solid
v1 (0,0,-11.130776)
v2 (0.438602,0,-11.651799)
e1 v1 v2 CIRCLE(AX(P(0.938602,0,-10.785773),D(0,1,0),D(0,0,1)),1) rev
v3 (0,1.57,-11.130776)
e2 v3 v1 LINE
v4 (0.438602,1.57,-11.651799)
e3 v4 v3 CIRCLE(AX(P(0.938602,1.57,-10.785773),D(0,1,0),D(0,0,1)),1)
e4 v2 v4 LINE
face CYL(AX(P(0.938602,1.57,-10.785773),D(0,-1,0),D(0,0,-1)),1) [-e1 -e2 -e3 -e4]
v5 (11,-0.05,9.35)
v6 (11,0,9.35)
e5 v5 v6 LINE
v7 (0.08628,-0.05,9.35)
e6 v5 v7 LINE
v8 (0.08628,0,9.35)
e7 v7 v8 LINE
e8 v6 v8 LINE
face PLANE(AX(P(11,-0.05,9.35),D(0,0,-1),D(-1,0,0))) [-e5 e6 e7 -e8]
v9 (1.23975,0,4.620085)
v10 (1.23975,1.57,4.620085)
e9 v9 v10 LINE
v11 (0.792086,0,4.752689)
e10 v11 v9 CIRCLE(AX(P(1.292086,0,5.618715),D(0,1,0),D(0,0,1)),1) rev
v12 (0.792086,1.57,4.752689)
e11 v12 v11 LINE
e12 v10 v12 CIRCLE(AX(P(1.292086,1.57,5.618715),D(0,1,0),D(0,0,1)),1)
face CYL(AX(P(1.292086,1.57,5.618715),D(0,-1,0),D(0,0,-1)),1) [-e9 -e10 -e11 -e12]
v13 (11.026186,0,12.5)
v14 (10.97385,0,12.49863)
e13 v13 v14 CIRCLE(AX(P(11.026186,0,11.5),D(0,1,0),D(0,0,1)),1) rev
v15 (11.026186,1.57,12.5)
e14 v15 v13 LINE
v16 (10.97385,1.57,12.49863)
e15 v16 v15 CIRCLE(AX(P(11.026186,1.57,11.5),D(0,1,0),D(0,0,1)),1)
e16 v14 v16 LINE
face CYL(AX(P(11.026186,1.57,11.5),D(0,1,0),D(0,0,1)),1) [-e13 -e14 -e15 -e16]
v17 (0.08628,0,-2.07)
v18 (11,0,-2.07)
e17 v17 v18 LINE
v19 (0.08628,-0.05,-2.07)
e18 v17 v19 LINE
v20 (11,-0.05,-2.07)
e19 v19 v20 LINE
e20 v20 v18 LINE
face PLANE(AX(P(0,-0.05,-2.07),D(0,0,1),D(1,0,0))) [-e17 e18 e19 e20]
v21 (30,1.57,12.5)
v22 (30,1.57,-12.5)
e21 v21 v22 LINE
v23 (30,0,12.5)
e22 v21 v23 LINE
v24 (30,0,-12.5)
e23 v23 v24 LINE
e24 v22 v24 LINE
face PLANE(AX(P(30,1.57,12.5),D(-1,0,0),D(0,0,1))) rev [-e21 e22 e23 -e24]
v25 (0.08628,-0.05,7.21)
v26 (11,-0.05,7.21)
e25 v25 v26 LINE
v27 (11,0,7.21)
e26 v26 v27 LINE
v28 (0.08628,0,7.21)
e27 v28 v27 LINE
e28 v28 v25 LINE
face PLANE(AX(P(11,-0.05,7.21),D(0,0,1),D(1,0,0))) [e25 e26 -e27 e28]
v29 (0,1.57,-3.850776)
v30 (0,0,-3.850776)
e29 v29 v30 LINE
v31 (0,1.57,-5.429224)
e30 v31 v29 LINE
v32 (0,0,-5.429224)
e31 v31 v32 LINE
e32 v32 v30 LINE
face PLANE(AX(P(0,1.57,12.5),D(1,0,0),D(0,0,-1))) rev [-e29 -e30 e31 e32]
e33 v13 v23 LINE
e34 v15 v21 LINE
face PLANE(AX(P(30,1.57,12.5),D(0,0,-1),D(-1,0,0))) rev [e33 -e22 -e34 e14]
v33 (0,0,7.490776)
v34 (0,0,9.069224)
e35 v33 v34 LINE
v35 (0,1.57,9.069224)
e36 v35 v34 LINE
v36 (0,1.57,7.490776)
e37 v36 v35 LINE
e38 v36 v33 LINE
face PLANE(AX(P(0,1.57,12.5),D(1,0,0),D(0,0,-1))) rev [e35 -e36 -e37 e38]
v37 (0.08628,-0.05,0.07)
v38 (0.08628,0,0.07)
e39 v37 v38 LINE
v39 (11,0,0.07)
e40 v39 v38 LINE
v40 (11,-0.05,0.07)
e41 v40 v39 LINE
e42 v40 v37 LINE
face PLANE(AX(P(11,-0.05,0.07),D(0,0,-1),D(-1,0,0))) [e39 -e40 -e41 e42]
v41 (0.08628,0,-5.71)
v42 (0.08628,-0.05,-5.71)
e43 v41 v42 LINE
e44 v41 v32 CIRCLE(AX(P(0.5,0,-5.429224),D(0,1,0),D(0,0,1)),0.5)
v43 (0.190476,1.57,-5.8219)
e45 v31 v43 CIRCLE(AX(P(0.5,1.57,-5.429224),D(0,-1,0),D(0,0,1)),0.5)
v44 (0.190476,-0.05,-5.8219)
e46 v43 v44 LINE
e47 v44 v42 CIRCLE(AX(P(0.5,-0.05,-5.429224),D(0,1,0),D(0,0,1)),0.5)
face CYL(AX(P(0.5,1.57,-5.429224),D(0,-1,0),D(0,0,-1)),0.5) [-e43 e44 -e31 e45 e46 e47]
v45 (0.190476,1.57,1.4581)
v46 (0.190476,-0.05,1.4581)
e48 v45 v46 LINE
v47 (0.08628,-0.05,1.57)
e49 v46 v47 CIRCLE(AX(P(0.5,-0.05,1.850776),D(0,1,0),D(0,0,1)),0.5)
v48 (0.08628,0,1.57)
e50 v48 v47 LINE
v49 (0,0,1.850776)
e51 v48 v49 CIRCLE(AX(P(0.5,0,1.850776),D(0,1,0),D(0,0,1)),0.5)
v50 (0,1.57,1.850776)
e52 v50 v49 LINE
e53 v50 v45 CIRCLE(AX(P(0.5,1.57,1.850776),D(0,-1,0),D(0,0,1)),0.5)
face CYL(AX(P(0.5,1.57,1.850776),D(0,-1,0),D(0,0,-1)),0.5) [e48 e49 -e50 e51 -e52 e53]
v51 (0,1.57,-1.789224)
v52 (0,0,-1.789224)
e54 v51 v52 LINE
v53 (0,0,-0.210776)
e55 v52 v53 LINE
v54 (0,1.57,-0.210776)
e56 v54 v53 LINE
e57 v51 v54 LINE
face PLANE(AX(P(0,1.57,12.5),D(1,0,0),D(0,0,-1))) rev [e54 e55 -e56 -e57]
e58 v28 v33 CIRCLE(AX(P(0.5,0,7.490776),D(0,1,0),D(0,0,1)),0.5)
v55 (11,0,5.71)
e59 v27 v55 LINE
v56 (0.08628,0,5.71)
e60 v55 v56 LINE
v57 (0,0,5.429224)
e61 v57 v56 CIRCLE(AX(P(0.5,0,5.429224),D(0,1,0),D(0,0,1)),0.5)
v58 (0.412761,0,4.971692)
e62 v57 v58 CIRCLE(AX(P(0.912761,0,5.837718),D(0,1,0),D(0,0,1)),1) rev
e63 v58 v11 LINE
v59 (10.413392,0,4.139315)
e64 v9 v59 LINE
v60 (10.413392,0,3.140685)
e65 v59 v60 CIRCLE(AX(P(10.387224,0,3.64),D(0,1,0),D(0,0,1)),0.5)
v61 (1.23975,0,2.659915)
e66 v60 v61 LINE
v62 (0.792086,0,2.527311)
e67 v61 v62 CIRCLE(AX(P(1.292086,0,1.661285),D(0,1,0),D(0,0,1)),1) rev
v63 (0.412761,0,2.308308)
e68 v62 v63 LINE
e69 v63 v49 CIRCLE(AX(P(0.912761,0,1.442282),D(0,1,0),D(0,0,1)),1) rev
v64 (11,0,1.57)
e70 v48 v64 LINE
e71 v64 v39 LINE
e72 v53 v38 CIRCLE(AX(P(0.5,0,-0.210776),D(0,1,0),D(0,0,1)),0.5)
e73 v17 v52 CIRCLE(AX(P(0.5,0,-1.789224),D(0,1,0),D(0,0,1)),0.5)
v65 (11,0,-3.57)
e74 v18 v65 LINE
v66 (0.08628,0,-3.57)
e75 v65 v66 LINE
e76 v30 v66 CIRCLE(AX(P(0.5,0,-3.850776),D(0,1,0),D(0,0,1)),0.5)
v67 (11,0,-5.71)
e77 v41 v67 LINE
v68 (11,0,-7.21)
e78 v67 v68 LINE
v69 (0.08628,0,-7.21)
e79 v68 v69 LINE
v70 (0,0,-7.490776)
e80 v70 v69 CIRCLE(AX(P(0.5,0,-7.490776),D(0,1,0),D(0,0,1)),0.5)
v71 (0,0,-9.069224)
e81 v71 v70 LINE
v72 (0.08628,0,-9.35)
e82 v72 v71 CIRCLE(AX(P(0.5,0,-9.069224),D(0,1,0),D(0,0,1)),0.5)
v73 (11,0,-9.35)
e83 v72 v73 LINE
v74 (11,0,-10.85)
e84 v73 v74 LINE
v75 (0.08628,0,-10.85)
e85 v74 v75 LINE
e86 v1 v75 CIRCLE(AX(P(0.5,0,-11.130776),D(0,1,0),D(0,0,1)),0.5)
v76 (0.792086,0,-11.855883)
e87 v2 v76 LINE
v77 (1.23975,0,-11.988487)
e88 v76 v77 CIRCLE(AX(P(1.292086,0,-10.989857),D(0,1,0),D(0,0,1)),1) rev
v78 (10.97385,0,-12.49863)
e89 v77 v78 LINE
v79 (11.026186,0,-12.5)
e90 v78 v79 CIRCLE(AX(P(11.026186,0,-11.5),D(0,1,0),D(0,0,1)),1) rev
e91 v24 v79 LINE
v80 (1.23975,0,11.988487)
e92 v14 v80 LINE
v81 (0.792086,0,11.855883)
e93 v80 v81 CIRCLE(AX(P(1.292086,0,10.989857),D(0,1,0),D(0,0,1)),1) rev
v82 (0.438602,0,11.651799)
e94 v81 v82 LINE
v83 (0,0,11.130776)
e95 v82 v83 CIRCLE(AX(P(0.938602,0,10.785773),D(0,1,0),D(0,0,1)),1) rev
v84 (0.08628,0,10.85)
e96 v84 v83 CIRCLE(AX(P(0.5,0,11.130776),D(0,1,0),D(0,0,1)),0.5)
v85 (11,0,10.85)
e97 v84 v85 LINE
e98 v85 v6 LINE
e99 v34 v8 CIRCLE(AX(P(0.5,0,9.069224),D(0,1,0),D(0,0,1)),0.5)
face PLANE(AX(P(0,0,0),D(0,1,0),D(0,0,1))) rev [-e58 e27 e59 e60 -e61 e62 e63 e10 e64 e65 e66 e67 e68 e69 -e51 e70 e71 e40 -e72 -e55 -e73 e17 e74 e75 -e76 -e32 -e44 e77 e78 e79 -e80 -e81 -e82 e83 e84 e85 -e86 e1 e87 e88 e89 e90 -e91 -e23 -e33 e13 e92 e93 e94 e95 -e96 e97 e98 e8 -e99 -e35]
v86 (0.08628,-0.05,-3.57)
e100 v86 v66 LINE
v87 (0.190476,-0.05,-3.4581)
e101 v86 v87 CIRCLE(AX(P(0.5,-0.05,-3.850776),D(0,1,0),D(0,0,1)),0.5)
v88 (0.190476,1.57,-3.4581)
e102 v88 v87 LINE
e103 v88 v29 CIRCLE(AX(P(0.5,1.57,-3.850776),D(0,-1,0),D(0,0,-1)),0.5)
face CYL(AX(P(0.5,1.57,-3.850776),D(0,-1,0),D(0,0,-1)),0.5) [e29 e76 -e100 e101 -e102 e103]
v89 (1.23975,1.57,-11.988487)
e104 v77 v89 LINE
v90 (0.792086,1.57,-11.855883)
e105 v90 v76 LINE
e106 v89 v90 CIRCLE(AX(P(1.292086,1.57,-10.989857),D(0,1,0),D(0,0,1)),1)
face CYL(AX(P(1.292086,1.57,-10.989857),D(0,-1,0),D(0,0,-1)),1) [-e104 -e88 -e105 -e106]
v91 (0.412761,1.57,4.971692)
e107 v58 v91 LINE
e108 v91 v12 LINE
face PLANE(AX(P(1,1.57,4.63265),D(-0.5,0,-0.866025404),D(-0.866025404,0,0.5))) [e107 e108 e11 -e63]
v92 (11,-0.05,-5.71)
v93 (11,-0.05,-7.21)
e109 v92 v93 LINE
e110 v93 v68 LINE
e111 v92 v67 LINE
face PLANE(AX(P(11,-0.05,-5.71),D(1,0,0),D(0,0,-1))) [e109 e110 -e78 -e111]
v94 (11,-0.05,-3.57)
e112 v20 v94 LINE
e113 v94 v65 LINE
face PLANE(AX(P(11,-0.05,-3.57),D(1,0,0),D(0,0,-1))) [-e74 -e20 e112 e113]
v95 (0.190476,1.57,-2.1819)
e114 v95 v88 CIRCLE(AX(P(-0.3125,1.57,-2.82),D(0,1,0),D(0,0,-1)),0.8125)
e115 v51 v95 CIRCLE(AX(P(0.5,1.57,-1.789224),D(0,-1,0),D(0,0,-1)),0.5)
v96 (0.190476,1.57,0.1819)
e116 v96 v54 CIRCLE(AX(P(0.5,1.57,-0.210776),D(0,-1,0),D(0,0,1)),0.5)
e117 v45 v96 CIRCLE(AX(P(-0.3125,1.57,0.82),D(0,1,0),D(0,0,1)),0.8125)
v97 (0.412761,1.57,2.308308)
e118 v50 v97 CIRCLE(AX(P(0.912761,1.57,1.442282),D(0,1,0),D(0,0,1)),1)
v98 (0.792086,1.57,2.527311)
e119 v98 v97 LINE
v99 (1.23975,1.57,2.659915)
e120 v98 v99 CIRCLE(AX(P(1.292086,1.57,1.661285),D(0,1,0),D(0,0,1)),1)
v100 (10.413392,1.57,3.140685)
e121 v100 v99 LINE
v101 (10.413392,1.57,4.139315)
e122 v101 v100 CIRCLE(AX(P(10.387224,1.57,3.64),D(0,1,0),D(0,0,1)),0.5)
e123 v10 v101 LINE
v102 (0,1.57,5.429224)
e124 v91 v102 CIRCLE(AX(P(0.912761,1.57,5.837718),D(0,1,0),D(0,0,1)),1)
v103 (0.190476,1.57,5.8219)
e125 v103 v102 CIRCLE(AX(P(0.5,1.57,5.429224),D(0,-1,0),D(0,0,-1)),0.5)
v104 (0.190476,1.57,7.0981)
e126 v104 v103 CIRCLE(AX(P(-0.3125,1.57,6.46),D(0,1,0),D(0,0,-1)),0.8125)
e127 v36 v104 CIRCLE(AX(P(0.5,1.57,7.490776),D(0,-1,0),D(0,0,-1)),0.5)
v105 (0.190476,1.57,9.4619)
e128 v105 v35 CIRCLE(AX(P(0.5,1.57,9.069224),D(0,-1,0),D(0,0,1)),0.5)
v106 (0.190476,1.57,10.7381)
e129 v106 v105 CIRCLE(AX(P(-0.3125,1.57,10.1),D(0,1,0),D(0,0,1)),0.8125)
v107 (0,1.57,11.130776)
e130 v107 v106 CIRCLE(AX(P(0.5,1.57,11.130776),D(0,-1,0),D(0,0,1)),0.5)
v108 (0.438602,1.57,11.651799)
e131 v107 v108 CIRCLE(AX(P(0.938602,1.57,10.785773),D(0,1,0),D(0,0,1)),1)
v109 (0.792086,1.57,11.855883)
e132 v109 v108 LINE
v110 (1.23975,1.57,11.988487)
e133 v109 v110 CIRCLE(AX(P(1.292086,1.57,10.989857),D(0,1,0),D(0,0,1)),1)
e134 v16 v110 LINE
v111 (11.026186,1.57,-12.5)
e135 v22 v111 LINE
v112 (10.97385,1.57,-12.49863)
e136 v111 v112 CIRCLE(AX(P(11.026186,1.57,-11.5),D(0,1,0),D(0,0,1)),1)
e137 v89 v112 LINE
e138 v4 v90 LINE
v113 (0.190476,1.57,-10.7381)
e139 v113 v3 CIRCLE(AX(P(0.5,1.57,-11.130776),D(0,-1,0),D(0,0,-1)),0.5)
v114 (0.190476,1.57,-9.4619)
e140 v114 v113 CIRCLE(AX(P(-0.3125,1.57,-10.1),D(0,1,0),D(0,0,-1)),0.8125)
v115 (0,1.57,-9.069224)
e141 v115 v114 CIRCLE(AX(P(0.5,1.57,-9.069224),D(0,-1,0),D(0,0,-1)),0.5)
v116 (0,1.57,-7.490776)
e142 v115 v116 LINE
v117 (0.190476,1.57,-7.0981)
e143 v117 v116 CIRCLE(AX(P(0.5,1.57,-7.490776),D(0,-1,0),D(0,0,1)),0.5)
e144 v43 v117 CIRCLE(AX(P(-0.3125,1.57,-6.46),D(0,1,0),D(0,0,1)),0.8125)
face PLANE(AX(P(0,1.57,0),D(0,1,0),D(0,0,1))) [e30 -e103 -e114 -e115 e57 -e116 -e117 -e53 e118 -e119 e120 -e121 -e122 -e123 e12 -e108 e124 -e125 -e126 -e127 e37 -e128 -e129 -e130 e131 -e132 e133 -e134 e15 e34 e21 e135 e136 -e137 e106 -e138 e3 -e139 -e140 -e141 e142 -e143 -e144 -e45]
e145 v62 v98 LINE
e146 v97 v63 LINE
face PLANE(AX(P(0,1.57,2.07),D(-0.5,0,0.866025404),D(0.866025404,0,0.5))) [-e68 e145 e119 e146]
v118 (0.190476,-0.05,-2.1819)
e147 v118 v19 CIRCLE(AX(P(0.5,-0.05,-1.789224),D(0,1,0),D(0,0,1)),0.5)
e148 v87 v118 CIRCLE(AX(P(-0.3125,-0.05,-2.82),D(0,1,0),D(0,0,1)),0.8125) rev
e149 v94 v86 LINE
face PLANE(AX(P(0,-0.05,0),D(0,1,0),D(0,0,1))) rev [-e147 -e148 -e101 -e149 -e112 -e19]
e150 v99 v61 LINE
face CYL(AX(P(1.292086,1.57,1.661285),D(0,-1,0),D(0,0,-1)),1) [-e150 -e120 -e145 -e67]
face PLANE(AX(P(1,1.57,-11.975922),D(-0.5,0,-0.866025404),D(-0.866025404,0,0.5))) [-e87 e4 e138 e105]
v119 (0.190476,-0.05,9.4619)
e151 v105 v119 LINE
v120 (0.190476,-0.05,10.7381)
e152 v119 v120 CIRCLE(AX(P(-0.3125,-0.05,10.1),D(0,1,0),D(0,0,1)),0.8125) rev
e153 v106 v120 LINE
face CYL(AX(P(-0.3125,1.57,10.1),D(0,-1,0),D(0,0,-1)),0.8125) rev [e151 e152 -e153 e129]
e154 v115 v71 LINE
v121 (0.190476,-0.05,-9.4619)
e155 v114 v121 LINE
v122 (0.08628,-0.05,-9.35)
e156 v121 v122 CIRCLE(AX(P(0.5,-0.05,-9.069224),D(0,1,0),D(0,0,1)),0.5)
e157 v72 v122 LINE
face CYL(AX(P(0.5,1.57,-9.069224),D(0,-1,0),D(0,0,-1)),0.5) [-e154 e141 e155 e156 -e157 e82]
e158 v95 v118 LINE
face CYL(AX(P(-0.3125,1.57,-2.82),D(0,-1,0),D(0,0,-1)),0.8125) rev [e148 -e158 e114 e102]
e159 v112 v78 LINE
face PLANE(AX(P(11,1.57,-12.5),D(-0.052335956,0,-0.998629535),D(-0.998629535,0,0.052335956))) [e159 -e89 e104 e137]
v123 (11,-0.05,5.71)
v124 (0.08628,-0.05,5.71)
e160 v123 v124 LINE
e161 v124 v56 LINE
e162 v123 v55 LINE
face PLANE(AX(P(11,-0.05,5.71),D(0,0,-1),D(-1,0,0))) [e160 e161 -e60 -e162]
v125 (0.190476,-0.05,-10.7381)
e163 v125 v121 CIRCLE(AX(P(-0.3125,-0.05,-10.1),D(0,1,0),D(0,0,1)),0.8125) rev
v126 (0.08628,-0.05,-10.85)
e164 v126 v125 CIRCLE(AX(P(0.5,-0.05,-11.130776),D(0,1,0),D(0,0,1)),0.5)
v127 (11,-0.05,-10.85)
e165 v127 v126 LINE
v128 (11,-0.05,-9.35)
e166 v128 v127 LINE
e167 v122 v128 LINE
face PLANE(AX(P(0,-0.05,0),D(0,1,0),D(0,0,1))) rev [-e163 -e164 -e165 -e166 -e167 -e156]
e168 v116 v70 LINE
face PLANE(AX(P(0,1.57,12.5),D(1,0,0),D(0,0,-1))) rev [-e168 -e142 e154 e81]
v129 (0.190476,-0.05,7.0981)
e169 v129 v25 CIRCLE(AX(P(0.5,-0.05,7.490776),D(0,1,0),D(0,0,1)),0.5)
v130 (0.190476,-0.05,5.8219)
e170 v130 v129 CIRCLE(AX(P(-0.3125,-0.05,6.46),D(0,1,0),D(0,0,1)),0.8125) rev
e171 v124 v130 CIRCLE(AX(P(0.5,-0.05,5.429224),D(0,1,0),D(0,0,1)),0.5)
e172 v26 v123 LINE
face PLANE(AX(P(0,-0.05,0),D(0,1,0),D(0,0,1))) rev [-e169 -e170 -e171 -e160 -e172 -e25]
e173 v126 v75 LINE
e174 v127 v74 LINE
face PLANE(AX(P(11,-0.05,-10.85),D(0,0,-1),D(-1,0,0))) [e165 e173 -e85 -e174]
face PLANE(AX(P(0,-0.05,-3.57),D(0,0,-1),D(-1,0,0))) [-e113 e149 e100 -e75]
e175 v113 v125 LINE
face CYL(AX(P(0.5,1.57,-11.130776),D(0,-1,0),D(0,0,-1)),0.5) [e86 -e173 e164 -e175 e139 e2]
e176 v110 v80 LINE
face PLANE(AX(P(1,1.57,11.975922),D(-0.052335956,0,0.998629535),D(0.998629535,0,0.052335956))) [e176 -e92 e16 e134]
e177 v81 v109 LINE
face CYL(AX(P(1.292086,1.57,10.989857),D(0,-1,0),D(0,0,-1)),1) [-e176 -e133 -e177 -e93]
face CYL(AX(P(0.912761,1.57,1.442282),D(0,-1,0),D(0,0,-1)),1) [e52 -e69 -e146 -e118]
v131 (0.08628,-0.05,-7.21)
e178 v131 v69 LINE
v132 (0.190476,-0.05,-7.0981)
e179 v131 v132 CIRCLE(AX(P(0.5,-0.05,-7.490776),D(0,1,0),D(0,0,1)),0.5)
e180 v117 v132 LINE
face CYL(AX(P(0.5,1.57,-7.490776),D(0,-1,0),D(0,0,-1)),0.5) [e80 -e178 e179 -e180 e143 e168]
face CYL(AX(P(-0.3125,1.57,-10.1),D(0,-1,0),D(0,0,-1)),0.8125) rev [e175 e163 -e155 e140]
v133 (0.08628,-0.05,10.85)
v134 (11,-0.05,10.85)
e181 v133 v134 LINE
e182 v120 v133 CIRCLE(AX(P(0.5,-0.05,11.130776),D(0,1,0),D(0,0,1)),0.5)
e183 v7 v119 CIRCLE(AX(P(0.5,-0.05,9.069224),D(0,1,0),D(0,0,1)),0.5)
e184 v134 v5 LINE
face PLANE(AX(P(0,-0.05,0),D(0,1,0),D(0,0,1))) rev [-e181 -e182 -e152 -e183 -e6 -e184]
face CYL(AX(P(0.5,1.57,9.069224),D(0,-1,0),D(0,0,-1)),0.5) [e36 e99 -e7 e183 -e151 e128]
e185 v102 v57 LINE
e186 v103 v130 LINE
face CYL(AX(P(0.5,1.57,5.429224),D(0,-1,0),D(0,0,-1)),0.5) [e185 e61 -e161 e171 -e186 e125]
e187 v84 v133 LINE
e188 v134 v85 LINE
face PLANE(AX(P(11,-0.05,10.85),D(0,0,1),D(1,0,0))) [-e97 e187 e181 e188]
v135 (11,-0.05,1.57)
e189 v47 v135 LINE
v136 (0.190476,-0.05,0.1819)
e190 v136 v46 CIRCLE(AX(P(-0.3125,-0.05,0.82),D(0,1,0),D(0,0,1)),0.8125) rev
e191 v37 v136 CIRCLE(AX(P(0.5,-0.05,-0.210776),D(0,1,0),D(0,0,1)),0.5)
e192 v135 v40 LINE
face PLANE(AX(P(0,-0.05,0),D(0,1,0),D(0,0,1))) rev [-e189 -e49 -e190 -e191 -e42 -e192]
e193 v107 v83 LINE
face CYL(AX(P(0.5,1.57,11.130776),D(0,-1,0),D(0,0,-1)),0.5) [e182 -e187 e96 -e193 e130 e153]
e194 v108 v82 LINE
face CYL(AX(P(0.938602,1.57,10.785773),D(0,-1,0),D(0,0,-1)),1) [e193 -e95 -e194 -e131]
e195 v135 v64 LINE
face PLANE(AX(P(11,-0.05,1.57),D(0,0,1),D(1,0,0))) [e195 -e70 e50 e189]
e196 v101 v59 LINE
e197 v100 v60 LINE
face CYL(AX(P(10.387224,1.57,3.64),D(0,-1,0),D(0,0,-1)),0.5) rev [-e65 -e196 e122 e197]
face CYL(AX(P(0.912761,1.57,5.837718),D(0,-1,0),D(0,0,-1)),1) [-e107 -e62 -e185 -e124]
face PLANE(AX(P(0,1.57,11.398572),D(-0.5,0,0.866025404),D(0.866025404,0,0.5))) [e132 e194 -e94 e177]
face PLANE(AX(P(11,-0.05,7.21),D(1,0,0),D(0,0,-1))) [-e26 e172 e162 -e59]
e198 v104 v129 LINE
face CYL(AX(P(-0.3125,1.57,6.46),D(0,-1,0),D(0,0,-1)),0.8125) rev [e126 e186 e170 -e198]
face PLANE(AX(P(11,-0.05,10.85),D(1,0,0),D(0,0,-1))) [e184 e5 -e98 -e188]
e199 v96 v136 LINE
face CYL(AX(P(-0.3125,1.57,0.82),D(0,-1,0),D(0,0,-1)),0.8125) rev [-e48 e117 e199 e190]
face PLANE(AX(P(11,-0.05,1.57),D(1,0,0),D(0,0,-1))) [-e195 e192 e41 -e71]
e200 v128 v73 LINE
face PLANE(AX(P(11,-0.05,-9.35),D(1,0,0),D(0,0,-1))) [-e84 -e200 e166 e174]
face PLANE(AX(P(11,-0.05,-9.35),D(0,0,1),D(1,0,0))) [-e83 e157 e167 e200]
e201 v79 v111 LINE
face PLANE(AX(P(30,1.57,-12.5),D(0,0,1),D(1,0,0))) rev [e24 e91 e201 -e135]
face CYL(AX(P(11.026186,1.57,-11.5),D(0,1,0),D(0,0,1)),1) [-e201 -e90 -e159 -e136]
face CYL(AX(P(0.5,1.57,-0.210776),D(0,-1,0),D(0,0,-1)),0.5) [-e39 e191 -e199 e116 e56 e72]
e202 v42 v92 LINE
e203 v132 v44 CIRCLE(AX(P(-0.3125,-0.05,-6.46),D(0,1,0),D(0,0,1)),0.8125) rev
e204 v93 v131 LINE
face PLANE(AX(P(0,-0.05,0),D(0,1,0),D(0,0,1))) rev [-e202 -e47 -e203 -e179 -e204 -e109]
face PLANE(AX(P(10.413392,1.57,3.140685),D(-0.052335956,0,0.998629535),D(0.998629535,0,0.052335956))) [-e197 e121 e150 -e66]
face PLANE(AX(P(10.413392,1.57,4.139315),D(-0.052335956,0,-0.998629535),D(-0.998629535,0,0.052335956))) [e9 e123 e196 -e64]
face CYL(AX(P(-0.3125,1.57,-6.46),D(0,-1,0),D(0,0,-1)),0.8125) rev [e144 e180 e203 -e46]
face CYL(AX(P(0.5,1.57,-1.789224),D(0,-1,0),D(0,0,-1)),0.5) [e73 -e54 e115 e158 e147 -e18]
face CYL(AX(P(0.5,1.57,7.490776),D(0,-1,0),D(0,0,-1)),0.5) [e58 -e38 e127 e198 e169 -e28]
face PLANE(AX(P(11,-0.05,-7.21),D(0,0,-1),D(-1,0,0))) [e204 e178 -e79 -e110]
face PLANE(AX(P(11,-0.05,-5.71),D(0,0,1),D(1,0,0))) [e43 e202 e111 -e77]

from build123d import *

# Parameters (mm, degrees)
SKETCH1_W               = 30
SKETCH1_H               = 25
BOSS_EXTRUDE1_DEPTH     = 1.57
CUT_EXTRUDE1_DEPTH      = 33.53789944
SKETCH2_W               = 11
SKETCH2_H               = 1.5
BOSS_EXTRUDE2_DEPTH     = 0.05
CUT_EXTRUDE2_DEPTH      = 33.53789944
CUT_EXTRUDE2_DEPTH_BACK = 33.53789944
FILLET1_R               = 1


with BuildPart() as part:
    # Sketch1 → Boss-Extrude1 (new body)
    with BuildSketch(Plane(origin=(0, 0, 0), x_dir=(1, 0, 0), z_dir=(0, 1, 0))):
        with Locations((15, 0)):
            Rectangle(SKETCH1_W, SKETCH1_H)
    extrude(amount=BOSS_EXTRUDE1_DEPTH)

    # Sketch3 → Cut-Extrude1 (cut, through all)
    with BuildSketch(Plane(origin=(0, 0, 0), x_dir=(1, 0, 0), z_dir=(0, 1, 0))):
        with BuildLine():
            Line((10.41339187, -4.139314767), (1, -4.632649731))
            Line((1, -4.632649731), (0, -5.21))
            Line((0, -5.21), (0, -2.07))
            Line((0, -2.07), (1, -2.647350269))
            Line((1, -2.647350269), (10.41339187, -3.140685233))
            ThreePointArc((10.41339187, -3.140685233), (10.887223892, -3.64), (10.41339187, -4.139314767))
        make_face()
        Polygon((11, 12.5), (1, 11.975922207), (0, 11.398571938), (0, 12.5), align=None)
        Polygon((11, -12.5), (0, -12.5), (0, -11.398571938), (1, -11.975922207), align=None)
    extrude(amount=CUT_EXTRUDE1_DEPTH, mode=Mode.SUBTRACT)

    # Sketch2 → Boss-Extrude2 (add)
    with BuildSketch(Plane(origin=(0, 0, 0), x_dir=(1, 0, 0), z_dir=(0, 1, 0))):
        with Locations((5.5, -10.1)):
            Rectangle(SKETCH2_W, SKETCH2_H)
        with Locations((5.5, -6.46)):
            Rectangle(SKETCH2_W, SKETCH2_H)
        with Locations((5.5, -0.82)):
            Rectangle(SKETCH2_W, SKETCH2_H)
        with Locations((5.5, 2.82)):
            Rectangle(SKETCH2_W, SKETCH2_H)
        with Locations((5.5, 6.46)):
            Rectangle(SKETCH2_W, SKETCH2_H)
        with Locations((5.5, 10.1)):
            Rectangle(SKETCH2_W, SKETCH2_H)
    extrude(amount=-BOSS_EXTRUDE2_DEPTH)

    # Sketch4 → Cut-Extrude2 (cut, two sides: drawn at the far end of the back side and taken through both)
    with BuildSketch(Plane(origin=(0, 0, 0), x_dir=(1, 0, 0), z_dir=(0, 1, 0)).offset(-CUT_EXTRUDE2_DEPTH_BACK)):
        with BuildLine():
            Line((0, -11.130776406), (0, -9.069223594))
            ThreePointArc((0, -9.069223594), (0.050132295, -9.287441484), (0.19047619, -9.46190032))
            ThreePointArc((0.19047619, -9.46190032), (0.5, -10.1), (0.19047619, -10.73809968))
            ThreePointArc((0.19047619, -10.73809968), (0.050132295, -10.912558516), (0, -11.130776406))
        make_face()
        with BuildLine():
            Line((0, -5.429223594), (0, -7.490776406))
            ThreePointArc((0, -7.490776406), (0.050132295, -7.272558516), (0.19047619, -7.09809968))
            ThreePointArc((0.19047619, -7.09809968), (0.5, -6.46), (0.19047619, -5.82190032))
            ThreePointArc((0.19047619, -5.82190032), (0.050132295, -5.647441484), (0, -5.429223594))
        make_face()
        with BuildLine():
            Line((0, -1.850776406), (0, 0.210776406))
            ThreePointArc((0, 0.210776406), (0.050132295, -0.007441484), (0.19047619, -0.18190032))
            ThreePointArc((0.19047619, -0.18190032), (0.5, -0.82), (0.19047619, -1.45809968))
            ThreePointArc((0.19047619, -1.45809968), (0.050132295, -1.632558516), (0, -1.850776406))
        make_face()
        with BuildLine():
            Line((0, 3.850776406), (0, 1.789223594))
            ThreePointArc((0, 1.789223594), (0.050132295, 2.007441484), (0.19047619, 2.18190032))
            ThreePointArc((0.19047619, 2.18190032), (0.5, 2.82), (0.19047619, 3.45809968))
            ThreePointArc((0.19047619, 3.45809968), (0.050132295, 3.632558516), (0, 3.850776406))
        make_face()
        with BuildLine():
            Line((0, 5.429223594), (0, 7.490776406))
            ThreePointArc((0, 7.490776406), (0.050132295, 7.272558516), (0.19047619, 7.09809968))
            ThreePointArc((0.19047619, 7.09809968), (0.5, 6.46), (0.19047619, 5.82190032))
            ThreePointArc((0.19047619, 5.82190032), (0.050132295, 5.647441484), (0, 5.429223594))
        make_face()
        with BuildLine():
            Line((0, 11.130776406), (0, 9.069223594))
            ThreePointArc((0, 9.069223594), (0.050132295, 9.287441484), (0.19047619, 9.46190032))
            ThreePointArc((0.19047619, 9.46190032), (0.5, 10.1), (0.19047619, 10.73809968))
            ThreePointArc((0.19047619, 10.73809968), (0.050132295, 10.912558516), (0, 11.130776406))
        make_face()
    extrude(amount=CUT_EXTRUDE2_DEPTH + CUT_EXTRUDE2_DEPTH_BACK, mode=Mode.SUBTRACT)

    # Fillet1
    # the kernel refuses this fillet: 1 mm, written as the material it takes off along each edge
    with BuildSketch(Plane(origin=(1, -0.600196898, -11.975922207), x_dir=(0.998629534754574, 0, -0.0523359562429405), z_dir=(0, 1, 0)), Plane(origin=(1, -0.600196898, 4.632649731), x_dir=(0.9986295347545742, 0, -0.05233595624293651), z_dir=(0, 1, 0)), Plane(origin=(1, -0.600196898, 2.647350269), x_dir=(-0.8660254037844378, 0, -0.5000000000000013), z_dir=(0, 1, 0))) as fillet1_piece_1:
        with BuildLine():
            CenterArc((FILLET1_R * 0.24007875908, -FILLET1_R), FILLET1_R, 90, 27)
            Line((-FILLET1_R * 0.213911740659, -FILLET1_R * 0.108993475812), (-FILLET1_R * 0.222991550654, -FILLET1_R * 0.0911733453279))
            Line((-FILLET1_R * 0.222991550654, -FILLET1_R * 0.0911733453279), (-FILLET1_R * 0.0048015751816, FILLET1_R * 0.02))
            Line((-FILLET1_R * 0.0048015751816, FILLET1_R * 0.02), (FILLET1_R * 0.24007875908, FILLET1_R * 0.02))
            Line((FILLET1_R * 0.24007875908, FILLET1_R * 0.02), (FILLET1_R * 0.24007875908, 0))
        make_face()
    extrude(amount=2.770393795, mode=Mode.SUBTRACT)
    with BuildSketch(Plane(origin=(0, -1.266133532, -11.398571938), x_dir=(0.8660254037844373, 0, -0.5000000000000024), z_dir=(0, 1, 0))) as fillet1_piece_2:
        with BuildLine():
            CenterArc((0.506453413, -1), FILLET1_R, 90, 39.818010975)
            Line((-0.133897766, -0.231917733), (-0.146704789, -0.216556088))
            ThreePointArc((-0.146704789, -0.216556088), (-0.084269391, -0.105958867), (-0.017320508, 0.01))
            Line((-0.017320508, 0.01), (0, 0.02))
            Line((0, 0.02), (0.506453413, 0.02))
            Line((0.506453413, 0.02), (0.506453413, 0))
        make_face()
    extrude(amount=4.102267063, mode=Mode.SUBTRACT)
    with BuildSketch(Plane(origin=(0, -1.191538155, 5.21), x_dir=(0.8660254037844375, 0, -0.500000000000002), z_dir=(0, 1, 0))) as fillet1_piece_3:
        with BuildLine():
            CenterArc((0.476615262, -1), FILLET1_R, 90, 35.889723461)
            Line((-0.109611797, -0.189853201), (-0.121336338, -0.173650265))
            ThreePointArc((-0.121336338, -0.173650265), (-0.072126406, -0.084926601), (-0.017320508, 0.01))
            Line((-0.017320508, 0.01), (0, 0.02))
            Line((0, 0.02), (0.476615262, 0.02))
            Line((0.476615262, 0.02), (0.476615262, 0))
        make_face()
    extrude(amount=3.953076309, mode=Mode.SUBTRACT)
    with BuildSketch(Plane(origin=(0, -1.191538155, 2.07), x_dir=(0, 0, -1), z_dir=(0, 1, 0))) as fillet1_piece_4:
        with BuildLine():
            CenterArc((0.627717773, -0.912760925), FILLET1_R, 114.110276539, 35.889723461)
            Line((-0.238307631, -0.412760925), (-0.255628139, -0.402760925))
            Line((-0.255628139, -0.402760925), (-0.017320508, 0.01))
            Line((-0.017320508, 0.01), (0, 0.02))
            ThreePointArc((0, 0.02), (0.109611797, 0.02), (0.21105371, 0.018255218))
            Line((0.21105371, 0.018255218), (0.219223594, 0))
        make_face()
    extrude(amount=3.953076309, mode=Mode.SUBTRACT)
    with BuildSketch(Plane(origin=(0, -1.266133532, 11.398571938), x_dir=(3.4310526757958135e-12, 0, -1.0), z_dir=(0, 1, 0))) as fillet1_piece_5:
        with BuildLine():
            CenterArc((0.612798697, -0.938601521), FILLET1_R, 110.181989025, 39.818010975)
            Line((-0.253226706, -0.438601521), (-0.270547214, -0.428601521))
            Line((-0.270547214, -0.428601521), (-0.017320508, 0.01))
            Line((-0.017320508, 0.01), (0, 0.02))
            ThreePointArc((0, 0.02), (0.133897766, 0.02), (0.260895468, 0.01877203))
            Line((0.260895468, 0.01877203), (0.267795532, 0))
        make_face()
    extrude(amount=4.102267063, mode=Mode.SUBTRACT)
    with BuildSketch(Plane(origin=(1, -0.600196898, 11.975922207), x_dir=(0.998629534754574, 0, 0.0523359562429404), z_dir=(0, 1, 0))) as fillet1_piece_6:
        with BuildLine():
            CenterArc((FILLET1_R * 0.24007875908, FILLET1_R), FILLET1_R, 243, 27)
            Line((-FILLET1_R * 0.213911740659, FILLET1_R * 0.108993475812), (-FILLET1_R * 0.222991550654, FILLET1_R * 0.0911733453279))
            Line((-FILLET1_R * 0.222991550654, FILLET1_R * 0.0911733453279), (-FILLET1_R * 0.0048015751816, -FILLET1_R * 0.02))
            Line((-FILLET1_R * 0.0048015751816, -FILLET1_R * 0.02), (FILLET1_R * 0.24007875908, -FILLET1_R * 0.02))
            Line((FILLET1_R * 0.24007875908, -FILLET1_R * 0.02), (FILLET1_R * 0.24007875908, 0))
        make_face()
    extrude(amount=2.770393795, mode=Mode.SUBTRACT)
    with BuildSketch(Plane(origin=(11, -0.065464804, -12.5), x_dir=(-0.998629534754574, 0, 0.05233595624294029), z_dir=(0, 1, 0)), Plane(origin=(11, -0.065464804, 12.5), x_dir=(1, 0, 0), z_dir=(0, 1, 0))) as fillet1_piece_7:
        with BuildLine():
            CenterArc((FILLET1_R * 0.0261859215692, FILLET1_R), FILLET1_R, 267, 3)
            Line((-FILLET1_R * 0.0261500346738, FILLET1_R * 0.00137046524543), (-FILLET1_R * 0.0271967537986, -FILLET1_R * 0.0186021254497))
            Line((-FILLET1_R * 0.0271967537986, -FILLET1_R * 0.0186021254497), (-FILLET1_R * 0.000523718431384, -FILLET1_R * 0.02))
            Line((-FILLET1_R * 0.000523718431384, -FILLET1_R * 0.02), (FILLET1_R * 0.0261859215692, -FILLET1_R * 0.02))
            Line((FILLET1_R * 0.0261859215692, -FILLET1_R * 0.02), (FILLET1_R * 0.0261859215692, 0))
        make_face()
    extrude(amount=1.700929608, mode=Mode.SUBTRACT)


solid = part.part
